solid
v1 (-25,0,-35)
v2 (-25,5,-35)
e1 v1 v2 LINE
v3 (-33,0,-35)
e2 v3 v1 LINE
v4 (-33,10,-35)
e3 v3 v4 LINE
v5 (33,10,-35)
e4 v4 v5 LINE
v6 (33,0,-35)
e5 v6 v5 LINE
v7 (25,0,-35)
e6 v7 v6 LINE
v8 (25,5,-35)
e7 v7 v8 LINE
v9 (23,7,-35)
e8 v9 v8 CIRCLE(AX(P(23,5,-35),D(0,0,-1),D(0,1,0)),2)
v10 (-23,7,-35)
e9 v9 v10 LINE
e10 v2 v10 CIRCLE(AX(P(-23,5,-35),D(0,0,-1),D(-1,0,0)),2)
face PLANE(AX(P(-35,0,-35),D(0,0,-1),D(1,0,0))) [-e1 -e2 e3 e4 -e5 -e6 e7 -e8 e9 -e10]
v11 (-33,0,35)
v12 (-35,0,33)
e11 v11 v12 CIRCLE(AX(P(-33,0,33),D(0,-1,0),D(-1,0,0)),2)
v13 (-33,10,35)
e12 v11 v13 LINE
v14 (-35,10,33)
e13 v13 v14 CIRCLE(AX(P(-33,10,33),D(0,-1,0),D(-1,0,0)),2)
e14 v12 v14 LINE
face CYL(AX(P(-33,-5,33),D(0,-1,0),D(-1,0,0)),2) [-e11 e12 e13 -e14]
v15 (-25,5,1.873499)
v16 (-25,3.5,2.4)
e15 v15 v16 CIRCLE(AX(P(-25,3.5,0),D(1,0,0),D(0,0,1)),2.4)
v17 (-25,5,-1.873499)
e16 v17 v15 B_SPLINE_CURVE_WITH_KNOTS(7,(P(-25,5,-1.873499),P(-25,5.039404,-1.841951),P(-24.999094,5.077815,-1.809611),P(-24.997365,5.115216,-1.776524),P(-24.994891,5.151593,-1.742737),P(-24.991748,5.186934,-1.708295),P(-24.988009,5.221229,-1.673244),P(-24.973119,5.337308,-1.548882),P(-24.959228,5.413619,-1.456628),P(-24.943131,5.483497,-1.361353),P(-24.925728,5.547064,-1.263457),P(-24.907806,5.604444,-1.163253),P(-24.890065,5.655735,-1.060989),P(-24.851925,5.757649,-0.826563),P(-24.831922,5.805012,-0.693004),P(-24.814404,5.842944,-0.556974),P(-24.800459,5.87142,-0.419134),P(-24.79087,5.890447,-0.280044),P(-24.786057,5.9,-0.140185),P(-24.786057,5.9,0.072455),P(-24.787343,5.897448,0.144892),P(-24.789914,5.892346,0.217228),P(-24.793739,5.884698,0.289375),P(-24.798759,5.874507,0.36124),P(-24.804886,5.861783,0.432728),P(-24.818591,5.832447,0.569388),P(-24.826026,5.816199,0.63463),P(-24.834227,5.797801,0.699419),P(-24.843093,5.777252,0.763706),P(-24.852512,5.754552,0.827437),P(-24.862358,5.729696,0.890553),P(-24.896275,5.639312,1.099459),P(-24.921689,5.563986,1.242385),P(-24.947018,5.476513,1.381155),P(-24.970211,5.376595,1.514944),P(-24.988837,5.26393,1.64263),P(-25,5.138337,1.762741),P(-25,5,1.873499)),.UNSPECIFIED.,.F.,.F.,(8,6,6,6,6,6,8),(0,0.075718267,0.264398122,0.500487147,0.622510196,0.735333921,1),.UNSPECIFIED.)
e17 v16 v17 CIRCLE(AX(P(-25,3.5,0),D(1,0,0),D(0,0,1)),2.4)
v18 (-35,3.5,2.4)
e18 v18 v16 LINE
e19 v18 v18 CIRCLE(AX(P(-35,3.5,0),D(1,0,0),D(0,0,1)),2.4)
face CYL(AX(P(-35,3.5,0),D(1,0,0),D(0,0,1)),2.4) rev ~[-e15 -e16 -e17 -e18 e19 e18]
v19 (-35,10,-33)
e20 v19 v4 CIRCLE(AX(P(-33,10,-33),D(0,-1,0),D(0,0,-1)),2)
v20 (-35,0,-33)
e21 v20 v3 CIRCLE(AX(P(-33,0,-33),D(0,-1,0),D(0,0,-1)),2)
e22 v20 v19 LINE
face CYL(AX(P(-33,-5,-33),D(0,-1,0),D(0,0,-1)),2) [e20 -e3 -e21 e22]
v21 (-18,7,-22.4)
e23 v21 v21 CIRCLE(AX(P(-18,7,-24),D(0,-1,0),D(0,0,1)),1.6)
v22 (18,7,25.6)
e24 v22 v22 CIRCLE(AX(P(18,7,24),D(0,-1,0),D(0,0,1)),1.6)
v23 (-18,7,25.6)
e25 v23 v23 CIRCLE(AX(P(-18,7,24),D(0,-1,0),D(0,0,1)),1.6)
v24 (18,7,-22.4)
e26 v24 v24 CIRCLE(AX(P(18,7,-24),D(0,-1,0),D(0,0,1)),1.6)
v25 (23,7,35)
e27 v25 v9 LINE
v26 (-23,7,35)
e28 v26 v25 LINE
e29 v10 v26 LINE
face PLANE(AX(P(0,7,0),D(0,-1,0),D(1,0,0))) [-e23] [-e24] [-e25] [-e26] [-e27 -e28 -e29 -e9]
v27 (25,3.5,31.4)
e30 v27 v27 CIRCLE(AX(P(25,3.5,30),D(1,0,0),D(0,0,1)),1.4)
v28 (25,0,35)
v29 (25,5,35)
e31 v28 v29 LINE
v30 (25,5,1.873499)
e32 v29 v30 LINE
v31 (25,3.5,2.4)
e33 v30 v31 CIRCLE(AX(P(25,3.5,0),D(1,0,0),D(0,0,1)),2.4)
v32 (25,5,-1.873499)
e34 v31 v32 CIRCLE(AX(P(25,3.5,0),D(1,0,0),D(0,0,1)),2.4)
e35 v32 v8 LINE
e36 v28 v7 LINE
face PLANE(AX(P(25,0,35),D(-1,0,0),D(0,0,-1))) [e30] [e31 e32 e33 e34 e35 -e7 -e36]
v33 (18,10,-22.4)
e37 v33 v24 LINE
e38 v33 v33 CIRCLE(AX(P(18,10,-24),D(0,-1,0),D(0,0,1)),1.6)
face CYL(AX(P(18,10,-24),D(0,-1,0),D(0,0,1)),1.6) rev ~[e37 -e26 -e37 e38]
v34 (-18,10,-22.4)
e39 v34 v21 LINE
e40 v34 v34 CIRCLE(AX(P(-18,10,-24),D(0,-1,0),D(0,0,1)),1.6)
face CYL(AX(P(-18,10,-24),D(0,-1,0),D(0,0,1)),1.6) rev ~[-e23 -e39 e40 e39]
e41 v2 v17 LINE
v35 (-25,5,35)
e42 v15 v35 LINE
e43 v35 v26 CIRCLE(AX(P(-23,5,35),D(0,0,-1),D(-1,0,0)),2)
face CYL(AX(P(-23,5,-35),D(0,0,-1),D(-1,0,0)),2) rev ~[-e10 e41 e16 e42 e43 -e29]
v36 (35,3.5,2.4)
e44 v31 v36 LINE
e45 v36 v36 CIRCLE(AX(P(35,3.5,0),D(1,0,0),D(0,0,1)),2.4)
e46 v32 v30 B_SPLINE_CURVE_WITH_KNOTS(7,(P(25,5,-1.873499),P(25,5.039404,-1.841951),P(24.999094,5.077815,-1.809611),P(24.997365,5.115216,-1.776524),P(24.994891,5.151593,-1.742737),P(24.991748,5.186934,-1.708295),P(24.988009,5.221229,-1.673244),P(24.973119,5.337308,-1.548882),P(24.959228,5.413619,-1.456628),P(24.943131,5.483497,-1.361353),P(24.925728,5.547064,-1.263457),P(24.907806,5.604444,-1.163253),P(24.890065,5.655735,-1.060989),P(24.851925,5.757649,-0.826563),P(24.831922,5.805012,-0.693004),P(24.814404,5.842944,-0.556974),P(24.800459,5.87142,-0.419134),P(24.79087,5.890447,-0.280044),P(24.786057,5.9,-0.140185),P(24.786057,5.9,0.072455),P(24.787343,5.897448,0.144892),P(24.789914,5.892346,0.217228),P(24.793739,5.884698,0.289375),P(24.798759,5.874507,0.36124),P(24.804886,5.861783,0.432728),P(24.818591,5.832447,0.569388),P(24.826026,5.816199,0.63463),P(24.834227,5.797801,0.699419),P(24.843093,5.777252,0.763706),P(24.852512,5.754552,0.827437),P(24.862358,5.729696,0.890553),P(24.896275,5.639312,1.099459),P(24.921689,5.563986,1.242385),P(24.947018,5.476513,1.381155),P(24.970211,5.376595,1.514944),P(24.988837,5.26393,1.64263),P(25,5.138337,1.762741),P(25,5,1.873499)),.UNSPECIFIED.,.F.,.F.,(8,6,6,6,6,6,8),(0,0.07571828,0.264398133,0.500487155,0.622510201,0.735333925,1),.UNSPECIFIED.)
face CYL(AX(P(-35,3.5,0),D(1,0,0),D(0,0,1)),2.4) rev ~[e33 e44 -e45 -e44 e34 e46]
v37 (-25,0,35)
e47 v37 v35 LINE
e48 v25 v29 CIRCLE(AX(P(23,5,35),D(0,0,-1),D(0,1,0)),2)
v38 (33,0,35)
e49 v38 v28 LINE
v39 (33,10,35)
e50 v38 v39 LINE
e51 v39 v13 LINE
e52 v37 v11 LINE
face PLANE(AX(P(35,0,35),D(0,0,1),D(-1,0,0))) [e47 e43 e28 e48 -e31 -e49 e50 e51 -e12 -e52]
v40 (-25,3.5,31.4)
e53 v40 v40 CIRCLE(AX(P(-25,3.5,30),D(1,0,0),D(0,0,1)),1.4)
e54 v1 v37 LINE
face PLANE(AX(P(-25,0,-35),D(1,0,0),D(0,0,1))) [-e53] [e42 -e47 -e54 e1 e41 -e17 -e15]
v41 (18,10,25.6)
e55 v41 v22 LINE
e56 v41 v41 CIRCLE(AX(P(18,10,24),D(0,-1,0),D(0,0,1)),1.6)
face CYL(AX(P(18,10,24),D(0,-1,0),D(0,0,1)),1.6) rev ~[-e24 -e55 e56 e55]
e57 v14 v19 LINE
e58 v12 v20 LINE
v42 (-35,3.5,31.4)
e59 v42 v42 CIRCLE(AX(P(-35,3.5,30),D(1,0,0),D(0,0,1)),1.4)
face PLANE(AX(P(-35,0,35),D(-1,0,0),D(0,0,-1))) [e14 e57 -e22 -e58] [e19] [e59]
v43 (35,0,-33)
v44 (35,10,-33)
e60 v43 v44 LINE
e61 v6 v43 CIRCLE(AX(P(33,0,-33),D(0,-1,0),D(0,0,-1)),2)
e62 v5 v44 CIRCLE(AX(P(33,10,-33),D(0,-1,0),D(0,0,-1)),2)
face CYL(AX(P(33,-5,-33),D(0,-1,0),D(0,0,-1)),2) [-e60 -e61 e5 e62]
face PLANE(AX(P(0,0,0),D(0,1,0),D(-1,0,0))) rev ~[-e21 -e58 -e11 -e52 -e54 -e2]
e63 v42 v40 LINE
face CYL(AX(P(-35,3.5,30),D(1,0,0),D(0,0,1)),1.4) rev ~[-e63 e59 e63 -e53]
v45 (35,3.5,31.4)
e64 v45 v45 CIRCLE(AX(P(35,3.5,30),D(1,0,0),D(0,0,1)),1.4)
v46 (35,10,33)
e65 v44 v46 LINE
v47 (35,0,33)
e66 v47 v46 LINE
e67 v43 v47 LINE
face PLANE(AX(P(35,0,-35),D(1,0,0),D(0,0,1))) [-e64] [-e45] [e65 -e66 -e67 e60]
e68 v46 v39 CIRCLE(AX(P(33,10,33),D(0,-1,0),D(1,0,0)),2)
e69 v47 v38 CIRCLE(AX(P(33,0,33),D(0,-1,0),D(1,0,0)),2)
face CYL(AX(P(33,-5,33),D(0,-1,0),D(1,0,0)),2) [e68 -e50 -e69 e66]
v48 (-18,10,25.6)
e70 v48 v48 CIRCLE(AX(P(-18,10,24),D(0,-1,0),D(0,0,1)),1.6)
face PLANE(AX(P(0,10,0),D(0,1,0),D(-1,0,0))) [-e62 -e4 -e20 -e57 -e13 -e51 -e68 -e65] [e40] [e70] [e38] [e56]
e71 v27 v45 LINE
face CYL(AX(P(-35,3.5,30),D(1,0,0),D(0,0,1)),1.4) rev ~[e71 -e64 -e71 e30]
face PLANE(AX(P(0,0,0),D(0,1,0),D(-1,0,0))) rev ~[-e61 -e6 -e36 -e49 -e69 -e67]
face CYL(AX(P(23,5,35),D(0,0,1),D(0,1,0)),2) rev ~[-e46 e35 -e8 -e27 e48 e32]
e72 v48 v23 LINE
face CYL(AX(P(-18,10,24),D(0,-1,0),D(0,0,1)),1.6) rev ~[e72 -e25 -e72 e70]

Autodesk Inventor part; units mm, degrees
ref_plane "YZ Plane" through (0, 0, 0) normal (1, 0, 0) x (0, 1, 0)
ref_plane "XZ Plane" through (0, 0, 0) normal (0, 1, 0) x (-1, 0, 0)
ref_plane "XY Plane" through (0, 0, 0) normal (0, 0, 1) x (1, 0, 0)
sketch "スケッチ1" plane through (0, 0, 0) normal (0, 1, 0) x (-1, 0, 0)
  line L0 (35, -35) -> (-35, -35)
  line L1 (-35, -35) -> (-35, 35)
  line L2 (-35, 35) -> (35, 35)
  line L3 (35, 35) -> (35, -35)
  line L4 (35, -35) -> (-35, 35) construction
  line L5 (-35, -35) -> (35, 35) construction
  point P0 (0, 0)
  dimension "d0" = 70
  dimension "d1" = 70
extrude "押し出し1" add sketch "スケッチ1" along normal blind 10
sketch "スケッチ2" plane through (0, 0, 0) normal (0, -1, 0) x (1, 0, 0)
  line L0 (35, -35) -> (-35, -35) projected
  line L1 (-25, 35) -> (25, 35)
  line L2 (25, 35) -> (25, -35)
  line L3 (25, -35) -> (-25, -35)
  line L4 (-25, -35) -> (-25, 35)
  line L5 (-25, 35) -> (25, -35) construction
  line L6 (25, 35) -> (-25, -35) construction
  point P0 (0, 0)
  dimension "d4" = 50
extrude "押し出し2" cut sketch "スケッチ2" against normal blind 7
sketch "スケッチ3" plane through (-35, 0, -35) normal (-1, 0, 0) x (0, 0, 1)
  line L0 (0, 0) -> (70, 0) projected
  point P0 (35, 0)
  point P1 (35, 3.5)
  point P2 (35, 0)
  dimension "d7" = 3.5
hole "穴1" at (-35, 3.5, 0) direction (1, 0, 0) diameter 4.8 end through all
sketch "スケッチ4" plane through (0, 10, 0) normal (0, 1, 0) x (1, 0, 0)
  line L0 (35, 35) -> (-35, 35) projected
  line L1 (-35, 35) -> (-35, -35) projected
  point P0 (0, 0)
  point P1 (-18, 24)
  point P2 (18, 24)
  point P3 (-18, -24)
  point P4 (18, -24)
  dimension "d15" = 18
  dimension "d16" = 24
  dimension "d17" = 11
  dimension "d18" = 17
  dimension "d21" = 36
  dimension "d24" = 48
hole "穴2" at (-18, 10, -24) at (18, 10, -24) at (-18, 10, 24) at (18, 10, 24) direction (0, -1, 0) diameter 3.2 end through all
sketch "スケッチ5" plane through (-35, 0, -35) normal (-1, 0, 0) x (0, 0, 1)
  line L0 (0, 0) -> (70, 0) projected
  circle A0 centre (35, 3.5) radius 2.4 projected
  point P0 (35, 0)
  point P1 (65, 3.5)
  dimension "d34" = 3.5
  dimension "d35" = 30
hole "穴3" at (-35, 3.5, 30) direction (1, 0, 0) diameter 2.8 end through all
fillet "フィレット1" radius 2 6 edges at (-35, 5, 35) (-35, 5, -35) (35, 5, -35) (35, 5, 35) (25, 7, 0) (-25, 7, 0)
properties part number "MID-360_mountA"
